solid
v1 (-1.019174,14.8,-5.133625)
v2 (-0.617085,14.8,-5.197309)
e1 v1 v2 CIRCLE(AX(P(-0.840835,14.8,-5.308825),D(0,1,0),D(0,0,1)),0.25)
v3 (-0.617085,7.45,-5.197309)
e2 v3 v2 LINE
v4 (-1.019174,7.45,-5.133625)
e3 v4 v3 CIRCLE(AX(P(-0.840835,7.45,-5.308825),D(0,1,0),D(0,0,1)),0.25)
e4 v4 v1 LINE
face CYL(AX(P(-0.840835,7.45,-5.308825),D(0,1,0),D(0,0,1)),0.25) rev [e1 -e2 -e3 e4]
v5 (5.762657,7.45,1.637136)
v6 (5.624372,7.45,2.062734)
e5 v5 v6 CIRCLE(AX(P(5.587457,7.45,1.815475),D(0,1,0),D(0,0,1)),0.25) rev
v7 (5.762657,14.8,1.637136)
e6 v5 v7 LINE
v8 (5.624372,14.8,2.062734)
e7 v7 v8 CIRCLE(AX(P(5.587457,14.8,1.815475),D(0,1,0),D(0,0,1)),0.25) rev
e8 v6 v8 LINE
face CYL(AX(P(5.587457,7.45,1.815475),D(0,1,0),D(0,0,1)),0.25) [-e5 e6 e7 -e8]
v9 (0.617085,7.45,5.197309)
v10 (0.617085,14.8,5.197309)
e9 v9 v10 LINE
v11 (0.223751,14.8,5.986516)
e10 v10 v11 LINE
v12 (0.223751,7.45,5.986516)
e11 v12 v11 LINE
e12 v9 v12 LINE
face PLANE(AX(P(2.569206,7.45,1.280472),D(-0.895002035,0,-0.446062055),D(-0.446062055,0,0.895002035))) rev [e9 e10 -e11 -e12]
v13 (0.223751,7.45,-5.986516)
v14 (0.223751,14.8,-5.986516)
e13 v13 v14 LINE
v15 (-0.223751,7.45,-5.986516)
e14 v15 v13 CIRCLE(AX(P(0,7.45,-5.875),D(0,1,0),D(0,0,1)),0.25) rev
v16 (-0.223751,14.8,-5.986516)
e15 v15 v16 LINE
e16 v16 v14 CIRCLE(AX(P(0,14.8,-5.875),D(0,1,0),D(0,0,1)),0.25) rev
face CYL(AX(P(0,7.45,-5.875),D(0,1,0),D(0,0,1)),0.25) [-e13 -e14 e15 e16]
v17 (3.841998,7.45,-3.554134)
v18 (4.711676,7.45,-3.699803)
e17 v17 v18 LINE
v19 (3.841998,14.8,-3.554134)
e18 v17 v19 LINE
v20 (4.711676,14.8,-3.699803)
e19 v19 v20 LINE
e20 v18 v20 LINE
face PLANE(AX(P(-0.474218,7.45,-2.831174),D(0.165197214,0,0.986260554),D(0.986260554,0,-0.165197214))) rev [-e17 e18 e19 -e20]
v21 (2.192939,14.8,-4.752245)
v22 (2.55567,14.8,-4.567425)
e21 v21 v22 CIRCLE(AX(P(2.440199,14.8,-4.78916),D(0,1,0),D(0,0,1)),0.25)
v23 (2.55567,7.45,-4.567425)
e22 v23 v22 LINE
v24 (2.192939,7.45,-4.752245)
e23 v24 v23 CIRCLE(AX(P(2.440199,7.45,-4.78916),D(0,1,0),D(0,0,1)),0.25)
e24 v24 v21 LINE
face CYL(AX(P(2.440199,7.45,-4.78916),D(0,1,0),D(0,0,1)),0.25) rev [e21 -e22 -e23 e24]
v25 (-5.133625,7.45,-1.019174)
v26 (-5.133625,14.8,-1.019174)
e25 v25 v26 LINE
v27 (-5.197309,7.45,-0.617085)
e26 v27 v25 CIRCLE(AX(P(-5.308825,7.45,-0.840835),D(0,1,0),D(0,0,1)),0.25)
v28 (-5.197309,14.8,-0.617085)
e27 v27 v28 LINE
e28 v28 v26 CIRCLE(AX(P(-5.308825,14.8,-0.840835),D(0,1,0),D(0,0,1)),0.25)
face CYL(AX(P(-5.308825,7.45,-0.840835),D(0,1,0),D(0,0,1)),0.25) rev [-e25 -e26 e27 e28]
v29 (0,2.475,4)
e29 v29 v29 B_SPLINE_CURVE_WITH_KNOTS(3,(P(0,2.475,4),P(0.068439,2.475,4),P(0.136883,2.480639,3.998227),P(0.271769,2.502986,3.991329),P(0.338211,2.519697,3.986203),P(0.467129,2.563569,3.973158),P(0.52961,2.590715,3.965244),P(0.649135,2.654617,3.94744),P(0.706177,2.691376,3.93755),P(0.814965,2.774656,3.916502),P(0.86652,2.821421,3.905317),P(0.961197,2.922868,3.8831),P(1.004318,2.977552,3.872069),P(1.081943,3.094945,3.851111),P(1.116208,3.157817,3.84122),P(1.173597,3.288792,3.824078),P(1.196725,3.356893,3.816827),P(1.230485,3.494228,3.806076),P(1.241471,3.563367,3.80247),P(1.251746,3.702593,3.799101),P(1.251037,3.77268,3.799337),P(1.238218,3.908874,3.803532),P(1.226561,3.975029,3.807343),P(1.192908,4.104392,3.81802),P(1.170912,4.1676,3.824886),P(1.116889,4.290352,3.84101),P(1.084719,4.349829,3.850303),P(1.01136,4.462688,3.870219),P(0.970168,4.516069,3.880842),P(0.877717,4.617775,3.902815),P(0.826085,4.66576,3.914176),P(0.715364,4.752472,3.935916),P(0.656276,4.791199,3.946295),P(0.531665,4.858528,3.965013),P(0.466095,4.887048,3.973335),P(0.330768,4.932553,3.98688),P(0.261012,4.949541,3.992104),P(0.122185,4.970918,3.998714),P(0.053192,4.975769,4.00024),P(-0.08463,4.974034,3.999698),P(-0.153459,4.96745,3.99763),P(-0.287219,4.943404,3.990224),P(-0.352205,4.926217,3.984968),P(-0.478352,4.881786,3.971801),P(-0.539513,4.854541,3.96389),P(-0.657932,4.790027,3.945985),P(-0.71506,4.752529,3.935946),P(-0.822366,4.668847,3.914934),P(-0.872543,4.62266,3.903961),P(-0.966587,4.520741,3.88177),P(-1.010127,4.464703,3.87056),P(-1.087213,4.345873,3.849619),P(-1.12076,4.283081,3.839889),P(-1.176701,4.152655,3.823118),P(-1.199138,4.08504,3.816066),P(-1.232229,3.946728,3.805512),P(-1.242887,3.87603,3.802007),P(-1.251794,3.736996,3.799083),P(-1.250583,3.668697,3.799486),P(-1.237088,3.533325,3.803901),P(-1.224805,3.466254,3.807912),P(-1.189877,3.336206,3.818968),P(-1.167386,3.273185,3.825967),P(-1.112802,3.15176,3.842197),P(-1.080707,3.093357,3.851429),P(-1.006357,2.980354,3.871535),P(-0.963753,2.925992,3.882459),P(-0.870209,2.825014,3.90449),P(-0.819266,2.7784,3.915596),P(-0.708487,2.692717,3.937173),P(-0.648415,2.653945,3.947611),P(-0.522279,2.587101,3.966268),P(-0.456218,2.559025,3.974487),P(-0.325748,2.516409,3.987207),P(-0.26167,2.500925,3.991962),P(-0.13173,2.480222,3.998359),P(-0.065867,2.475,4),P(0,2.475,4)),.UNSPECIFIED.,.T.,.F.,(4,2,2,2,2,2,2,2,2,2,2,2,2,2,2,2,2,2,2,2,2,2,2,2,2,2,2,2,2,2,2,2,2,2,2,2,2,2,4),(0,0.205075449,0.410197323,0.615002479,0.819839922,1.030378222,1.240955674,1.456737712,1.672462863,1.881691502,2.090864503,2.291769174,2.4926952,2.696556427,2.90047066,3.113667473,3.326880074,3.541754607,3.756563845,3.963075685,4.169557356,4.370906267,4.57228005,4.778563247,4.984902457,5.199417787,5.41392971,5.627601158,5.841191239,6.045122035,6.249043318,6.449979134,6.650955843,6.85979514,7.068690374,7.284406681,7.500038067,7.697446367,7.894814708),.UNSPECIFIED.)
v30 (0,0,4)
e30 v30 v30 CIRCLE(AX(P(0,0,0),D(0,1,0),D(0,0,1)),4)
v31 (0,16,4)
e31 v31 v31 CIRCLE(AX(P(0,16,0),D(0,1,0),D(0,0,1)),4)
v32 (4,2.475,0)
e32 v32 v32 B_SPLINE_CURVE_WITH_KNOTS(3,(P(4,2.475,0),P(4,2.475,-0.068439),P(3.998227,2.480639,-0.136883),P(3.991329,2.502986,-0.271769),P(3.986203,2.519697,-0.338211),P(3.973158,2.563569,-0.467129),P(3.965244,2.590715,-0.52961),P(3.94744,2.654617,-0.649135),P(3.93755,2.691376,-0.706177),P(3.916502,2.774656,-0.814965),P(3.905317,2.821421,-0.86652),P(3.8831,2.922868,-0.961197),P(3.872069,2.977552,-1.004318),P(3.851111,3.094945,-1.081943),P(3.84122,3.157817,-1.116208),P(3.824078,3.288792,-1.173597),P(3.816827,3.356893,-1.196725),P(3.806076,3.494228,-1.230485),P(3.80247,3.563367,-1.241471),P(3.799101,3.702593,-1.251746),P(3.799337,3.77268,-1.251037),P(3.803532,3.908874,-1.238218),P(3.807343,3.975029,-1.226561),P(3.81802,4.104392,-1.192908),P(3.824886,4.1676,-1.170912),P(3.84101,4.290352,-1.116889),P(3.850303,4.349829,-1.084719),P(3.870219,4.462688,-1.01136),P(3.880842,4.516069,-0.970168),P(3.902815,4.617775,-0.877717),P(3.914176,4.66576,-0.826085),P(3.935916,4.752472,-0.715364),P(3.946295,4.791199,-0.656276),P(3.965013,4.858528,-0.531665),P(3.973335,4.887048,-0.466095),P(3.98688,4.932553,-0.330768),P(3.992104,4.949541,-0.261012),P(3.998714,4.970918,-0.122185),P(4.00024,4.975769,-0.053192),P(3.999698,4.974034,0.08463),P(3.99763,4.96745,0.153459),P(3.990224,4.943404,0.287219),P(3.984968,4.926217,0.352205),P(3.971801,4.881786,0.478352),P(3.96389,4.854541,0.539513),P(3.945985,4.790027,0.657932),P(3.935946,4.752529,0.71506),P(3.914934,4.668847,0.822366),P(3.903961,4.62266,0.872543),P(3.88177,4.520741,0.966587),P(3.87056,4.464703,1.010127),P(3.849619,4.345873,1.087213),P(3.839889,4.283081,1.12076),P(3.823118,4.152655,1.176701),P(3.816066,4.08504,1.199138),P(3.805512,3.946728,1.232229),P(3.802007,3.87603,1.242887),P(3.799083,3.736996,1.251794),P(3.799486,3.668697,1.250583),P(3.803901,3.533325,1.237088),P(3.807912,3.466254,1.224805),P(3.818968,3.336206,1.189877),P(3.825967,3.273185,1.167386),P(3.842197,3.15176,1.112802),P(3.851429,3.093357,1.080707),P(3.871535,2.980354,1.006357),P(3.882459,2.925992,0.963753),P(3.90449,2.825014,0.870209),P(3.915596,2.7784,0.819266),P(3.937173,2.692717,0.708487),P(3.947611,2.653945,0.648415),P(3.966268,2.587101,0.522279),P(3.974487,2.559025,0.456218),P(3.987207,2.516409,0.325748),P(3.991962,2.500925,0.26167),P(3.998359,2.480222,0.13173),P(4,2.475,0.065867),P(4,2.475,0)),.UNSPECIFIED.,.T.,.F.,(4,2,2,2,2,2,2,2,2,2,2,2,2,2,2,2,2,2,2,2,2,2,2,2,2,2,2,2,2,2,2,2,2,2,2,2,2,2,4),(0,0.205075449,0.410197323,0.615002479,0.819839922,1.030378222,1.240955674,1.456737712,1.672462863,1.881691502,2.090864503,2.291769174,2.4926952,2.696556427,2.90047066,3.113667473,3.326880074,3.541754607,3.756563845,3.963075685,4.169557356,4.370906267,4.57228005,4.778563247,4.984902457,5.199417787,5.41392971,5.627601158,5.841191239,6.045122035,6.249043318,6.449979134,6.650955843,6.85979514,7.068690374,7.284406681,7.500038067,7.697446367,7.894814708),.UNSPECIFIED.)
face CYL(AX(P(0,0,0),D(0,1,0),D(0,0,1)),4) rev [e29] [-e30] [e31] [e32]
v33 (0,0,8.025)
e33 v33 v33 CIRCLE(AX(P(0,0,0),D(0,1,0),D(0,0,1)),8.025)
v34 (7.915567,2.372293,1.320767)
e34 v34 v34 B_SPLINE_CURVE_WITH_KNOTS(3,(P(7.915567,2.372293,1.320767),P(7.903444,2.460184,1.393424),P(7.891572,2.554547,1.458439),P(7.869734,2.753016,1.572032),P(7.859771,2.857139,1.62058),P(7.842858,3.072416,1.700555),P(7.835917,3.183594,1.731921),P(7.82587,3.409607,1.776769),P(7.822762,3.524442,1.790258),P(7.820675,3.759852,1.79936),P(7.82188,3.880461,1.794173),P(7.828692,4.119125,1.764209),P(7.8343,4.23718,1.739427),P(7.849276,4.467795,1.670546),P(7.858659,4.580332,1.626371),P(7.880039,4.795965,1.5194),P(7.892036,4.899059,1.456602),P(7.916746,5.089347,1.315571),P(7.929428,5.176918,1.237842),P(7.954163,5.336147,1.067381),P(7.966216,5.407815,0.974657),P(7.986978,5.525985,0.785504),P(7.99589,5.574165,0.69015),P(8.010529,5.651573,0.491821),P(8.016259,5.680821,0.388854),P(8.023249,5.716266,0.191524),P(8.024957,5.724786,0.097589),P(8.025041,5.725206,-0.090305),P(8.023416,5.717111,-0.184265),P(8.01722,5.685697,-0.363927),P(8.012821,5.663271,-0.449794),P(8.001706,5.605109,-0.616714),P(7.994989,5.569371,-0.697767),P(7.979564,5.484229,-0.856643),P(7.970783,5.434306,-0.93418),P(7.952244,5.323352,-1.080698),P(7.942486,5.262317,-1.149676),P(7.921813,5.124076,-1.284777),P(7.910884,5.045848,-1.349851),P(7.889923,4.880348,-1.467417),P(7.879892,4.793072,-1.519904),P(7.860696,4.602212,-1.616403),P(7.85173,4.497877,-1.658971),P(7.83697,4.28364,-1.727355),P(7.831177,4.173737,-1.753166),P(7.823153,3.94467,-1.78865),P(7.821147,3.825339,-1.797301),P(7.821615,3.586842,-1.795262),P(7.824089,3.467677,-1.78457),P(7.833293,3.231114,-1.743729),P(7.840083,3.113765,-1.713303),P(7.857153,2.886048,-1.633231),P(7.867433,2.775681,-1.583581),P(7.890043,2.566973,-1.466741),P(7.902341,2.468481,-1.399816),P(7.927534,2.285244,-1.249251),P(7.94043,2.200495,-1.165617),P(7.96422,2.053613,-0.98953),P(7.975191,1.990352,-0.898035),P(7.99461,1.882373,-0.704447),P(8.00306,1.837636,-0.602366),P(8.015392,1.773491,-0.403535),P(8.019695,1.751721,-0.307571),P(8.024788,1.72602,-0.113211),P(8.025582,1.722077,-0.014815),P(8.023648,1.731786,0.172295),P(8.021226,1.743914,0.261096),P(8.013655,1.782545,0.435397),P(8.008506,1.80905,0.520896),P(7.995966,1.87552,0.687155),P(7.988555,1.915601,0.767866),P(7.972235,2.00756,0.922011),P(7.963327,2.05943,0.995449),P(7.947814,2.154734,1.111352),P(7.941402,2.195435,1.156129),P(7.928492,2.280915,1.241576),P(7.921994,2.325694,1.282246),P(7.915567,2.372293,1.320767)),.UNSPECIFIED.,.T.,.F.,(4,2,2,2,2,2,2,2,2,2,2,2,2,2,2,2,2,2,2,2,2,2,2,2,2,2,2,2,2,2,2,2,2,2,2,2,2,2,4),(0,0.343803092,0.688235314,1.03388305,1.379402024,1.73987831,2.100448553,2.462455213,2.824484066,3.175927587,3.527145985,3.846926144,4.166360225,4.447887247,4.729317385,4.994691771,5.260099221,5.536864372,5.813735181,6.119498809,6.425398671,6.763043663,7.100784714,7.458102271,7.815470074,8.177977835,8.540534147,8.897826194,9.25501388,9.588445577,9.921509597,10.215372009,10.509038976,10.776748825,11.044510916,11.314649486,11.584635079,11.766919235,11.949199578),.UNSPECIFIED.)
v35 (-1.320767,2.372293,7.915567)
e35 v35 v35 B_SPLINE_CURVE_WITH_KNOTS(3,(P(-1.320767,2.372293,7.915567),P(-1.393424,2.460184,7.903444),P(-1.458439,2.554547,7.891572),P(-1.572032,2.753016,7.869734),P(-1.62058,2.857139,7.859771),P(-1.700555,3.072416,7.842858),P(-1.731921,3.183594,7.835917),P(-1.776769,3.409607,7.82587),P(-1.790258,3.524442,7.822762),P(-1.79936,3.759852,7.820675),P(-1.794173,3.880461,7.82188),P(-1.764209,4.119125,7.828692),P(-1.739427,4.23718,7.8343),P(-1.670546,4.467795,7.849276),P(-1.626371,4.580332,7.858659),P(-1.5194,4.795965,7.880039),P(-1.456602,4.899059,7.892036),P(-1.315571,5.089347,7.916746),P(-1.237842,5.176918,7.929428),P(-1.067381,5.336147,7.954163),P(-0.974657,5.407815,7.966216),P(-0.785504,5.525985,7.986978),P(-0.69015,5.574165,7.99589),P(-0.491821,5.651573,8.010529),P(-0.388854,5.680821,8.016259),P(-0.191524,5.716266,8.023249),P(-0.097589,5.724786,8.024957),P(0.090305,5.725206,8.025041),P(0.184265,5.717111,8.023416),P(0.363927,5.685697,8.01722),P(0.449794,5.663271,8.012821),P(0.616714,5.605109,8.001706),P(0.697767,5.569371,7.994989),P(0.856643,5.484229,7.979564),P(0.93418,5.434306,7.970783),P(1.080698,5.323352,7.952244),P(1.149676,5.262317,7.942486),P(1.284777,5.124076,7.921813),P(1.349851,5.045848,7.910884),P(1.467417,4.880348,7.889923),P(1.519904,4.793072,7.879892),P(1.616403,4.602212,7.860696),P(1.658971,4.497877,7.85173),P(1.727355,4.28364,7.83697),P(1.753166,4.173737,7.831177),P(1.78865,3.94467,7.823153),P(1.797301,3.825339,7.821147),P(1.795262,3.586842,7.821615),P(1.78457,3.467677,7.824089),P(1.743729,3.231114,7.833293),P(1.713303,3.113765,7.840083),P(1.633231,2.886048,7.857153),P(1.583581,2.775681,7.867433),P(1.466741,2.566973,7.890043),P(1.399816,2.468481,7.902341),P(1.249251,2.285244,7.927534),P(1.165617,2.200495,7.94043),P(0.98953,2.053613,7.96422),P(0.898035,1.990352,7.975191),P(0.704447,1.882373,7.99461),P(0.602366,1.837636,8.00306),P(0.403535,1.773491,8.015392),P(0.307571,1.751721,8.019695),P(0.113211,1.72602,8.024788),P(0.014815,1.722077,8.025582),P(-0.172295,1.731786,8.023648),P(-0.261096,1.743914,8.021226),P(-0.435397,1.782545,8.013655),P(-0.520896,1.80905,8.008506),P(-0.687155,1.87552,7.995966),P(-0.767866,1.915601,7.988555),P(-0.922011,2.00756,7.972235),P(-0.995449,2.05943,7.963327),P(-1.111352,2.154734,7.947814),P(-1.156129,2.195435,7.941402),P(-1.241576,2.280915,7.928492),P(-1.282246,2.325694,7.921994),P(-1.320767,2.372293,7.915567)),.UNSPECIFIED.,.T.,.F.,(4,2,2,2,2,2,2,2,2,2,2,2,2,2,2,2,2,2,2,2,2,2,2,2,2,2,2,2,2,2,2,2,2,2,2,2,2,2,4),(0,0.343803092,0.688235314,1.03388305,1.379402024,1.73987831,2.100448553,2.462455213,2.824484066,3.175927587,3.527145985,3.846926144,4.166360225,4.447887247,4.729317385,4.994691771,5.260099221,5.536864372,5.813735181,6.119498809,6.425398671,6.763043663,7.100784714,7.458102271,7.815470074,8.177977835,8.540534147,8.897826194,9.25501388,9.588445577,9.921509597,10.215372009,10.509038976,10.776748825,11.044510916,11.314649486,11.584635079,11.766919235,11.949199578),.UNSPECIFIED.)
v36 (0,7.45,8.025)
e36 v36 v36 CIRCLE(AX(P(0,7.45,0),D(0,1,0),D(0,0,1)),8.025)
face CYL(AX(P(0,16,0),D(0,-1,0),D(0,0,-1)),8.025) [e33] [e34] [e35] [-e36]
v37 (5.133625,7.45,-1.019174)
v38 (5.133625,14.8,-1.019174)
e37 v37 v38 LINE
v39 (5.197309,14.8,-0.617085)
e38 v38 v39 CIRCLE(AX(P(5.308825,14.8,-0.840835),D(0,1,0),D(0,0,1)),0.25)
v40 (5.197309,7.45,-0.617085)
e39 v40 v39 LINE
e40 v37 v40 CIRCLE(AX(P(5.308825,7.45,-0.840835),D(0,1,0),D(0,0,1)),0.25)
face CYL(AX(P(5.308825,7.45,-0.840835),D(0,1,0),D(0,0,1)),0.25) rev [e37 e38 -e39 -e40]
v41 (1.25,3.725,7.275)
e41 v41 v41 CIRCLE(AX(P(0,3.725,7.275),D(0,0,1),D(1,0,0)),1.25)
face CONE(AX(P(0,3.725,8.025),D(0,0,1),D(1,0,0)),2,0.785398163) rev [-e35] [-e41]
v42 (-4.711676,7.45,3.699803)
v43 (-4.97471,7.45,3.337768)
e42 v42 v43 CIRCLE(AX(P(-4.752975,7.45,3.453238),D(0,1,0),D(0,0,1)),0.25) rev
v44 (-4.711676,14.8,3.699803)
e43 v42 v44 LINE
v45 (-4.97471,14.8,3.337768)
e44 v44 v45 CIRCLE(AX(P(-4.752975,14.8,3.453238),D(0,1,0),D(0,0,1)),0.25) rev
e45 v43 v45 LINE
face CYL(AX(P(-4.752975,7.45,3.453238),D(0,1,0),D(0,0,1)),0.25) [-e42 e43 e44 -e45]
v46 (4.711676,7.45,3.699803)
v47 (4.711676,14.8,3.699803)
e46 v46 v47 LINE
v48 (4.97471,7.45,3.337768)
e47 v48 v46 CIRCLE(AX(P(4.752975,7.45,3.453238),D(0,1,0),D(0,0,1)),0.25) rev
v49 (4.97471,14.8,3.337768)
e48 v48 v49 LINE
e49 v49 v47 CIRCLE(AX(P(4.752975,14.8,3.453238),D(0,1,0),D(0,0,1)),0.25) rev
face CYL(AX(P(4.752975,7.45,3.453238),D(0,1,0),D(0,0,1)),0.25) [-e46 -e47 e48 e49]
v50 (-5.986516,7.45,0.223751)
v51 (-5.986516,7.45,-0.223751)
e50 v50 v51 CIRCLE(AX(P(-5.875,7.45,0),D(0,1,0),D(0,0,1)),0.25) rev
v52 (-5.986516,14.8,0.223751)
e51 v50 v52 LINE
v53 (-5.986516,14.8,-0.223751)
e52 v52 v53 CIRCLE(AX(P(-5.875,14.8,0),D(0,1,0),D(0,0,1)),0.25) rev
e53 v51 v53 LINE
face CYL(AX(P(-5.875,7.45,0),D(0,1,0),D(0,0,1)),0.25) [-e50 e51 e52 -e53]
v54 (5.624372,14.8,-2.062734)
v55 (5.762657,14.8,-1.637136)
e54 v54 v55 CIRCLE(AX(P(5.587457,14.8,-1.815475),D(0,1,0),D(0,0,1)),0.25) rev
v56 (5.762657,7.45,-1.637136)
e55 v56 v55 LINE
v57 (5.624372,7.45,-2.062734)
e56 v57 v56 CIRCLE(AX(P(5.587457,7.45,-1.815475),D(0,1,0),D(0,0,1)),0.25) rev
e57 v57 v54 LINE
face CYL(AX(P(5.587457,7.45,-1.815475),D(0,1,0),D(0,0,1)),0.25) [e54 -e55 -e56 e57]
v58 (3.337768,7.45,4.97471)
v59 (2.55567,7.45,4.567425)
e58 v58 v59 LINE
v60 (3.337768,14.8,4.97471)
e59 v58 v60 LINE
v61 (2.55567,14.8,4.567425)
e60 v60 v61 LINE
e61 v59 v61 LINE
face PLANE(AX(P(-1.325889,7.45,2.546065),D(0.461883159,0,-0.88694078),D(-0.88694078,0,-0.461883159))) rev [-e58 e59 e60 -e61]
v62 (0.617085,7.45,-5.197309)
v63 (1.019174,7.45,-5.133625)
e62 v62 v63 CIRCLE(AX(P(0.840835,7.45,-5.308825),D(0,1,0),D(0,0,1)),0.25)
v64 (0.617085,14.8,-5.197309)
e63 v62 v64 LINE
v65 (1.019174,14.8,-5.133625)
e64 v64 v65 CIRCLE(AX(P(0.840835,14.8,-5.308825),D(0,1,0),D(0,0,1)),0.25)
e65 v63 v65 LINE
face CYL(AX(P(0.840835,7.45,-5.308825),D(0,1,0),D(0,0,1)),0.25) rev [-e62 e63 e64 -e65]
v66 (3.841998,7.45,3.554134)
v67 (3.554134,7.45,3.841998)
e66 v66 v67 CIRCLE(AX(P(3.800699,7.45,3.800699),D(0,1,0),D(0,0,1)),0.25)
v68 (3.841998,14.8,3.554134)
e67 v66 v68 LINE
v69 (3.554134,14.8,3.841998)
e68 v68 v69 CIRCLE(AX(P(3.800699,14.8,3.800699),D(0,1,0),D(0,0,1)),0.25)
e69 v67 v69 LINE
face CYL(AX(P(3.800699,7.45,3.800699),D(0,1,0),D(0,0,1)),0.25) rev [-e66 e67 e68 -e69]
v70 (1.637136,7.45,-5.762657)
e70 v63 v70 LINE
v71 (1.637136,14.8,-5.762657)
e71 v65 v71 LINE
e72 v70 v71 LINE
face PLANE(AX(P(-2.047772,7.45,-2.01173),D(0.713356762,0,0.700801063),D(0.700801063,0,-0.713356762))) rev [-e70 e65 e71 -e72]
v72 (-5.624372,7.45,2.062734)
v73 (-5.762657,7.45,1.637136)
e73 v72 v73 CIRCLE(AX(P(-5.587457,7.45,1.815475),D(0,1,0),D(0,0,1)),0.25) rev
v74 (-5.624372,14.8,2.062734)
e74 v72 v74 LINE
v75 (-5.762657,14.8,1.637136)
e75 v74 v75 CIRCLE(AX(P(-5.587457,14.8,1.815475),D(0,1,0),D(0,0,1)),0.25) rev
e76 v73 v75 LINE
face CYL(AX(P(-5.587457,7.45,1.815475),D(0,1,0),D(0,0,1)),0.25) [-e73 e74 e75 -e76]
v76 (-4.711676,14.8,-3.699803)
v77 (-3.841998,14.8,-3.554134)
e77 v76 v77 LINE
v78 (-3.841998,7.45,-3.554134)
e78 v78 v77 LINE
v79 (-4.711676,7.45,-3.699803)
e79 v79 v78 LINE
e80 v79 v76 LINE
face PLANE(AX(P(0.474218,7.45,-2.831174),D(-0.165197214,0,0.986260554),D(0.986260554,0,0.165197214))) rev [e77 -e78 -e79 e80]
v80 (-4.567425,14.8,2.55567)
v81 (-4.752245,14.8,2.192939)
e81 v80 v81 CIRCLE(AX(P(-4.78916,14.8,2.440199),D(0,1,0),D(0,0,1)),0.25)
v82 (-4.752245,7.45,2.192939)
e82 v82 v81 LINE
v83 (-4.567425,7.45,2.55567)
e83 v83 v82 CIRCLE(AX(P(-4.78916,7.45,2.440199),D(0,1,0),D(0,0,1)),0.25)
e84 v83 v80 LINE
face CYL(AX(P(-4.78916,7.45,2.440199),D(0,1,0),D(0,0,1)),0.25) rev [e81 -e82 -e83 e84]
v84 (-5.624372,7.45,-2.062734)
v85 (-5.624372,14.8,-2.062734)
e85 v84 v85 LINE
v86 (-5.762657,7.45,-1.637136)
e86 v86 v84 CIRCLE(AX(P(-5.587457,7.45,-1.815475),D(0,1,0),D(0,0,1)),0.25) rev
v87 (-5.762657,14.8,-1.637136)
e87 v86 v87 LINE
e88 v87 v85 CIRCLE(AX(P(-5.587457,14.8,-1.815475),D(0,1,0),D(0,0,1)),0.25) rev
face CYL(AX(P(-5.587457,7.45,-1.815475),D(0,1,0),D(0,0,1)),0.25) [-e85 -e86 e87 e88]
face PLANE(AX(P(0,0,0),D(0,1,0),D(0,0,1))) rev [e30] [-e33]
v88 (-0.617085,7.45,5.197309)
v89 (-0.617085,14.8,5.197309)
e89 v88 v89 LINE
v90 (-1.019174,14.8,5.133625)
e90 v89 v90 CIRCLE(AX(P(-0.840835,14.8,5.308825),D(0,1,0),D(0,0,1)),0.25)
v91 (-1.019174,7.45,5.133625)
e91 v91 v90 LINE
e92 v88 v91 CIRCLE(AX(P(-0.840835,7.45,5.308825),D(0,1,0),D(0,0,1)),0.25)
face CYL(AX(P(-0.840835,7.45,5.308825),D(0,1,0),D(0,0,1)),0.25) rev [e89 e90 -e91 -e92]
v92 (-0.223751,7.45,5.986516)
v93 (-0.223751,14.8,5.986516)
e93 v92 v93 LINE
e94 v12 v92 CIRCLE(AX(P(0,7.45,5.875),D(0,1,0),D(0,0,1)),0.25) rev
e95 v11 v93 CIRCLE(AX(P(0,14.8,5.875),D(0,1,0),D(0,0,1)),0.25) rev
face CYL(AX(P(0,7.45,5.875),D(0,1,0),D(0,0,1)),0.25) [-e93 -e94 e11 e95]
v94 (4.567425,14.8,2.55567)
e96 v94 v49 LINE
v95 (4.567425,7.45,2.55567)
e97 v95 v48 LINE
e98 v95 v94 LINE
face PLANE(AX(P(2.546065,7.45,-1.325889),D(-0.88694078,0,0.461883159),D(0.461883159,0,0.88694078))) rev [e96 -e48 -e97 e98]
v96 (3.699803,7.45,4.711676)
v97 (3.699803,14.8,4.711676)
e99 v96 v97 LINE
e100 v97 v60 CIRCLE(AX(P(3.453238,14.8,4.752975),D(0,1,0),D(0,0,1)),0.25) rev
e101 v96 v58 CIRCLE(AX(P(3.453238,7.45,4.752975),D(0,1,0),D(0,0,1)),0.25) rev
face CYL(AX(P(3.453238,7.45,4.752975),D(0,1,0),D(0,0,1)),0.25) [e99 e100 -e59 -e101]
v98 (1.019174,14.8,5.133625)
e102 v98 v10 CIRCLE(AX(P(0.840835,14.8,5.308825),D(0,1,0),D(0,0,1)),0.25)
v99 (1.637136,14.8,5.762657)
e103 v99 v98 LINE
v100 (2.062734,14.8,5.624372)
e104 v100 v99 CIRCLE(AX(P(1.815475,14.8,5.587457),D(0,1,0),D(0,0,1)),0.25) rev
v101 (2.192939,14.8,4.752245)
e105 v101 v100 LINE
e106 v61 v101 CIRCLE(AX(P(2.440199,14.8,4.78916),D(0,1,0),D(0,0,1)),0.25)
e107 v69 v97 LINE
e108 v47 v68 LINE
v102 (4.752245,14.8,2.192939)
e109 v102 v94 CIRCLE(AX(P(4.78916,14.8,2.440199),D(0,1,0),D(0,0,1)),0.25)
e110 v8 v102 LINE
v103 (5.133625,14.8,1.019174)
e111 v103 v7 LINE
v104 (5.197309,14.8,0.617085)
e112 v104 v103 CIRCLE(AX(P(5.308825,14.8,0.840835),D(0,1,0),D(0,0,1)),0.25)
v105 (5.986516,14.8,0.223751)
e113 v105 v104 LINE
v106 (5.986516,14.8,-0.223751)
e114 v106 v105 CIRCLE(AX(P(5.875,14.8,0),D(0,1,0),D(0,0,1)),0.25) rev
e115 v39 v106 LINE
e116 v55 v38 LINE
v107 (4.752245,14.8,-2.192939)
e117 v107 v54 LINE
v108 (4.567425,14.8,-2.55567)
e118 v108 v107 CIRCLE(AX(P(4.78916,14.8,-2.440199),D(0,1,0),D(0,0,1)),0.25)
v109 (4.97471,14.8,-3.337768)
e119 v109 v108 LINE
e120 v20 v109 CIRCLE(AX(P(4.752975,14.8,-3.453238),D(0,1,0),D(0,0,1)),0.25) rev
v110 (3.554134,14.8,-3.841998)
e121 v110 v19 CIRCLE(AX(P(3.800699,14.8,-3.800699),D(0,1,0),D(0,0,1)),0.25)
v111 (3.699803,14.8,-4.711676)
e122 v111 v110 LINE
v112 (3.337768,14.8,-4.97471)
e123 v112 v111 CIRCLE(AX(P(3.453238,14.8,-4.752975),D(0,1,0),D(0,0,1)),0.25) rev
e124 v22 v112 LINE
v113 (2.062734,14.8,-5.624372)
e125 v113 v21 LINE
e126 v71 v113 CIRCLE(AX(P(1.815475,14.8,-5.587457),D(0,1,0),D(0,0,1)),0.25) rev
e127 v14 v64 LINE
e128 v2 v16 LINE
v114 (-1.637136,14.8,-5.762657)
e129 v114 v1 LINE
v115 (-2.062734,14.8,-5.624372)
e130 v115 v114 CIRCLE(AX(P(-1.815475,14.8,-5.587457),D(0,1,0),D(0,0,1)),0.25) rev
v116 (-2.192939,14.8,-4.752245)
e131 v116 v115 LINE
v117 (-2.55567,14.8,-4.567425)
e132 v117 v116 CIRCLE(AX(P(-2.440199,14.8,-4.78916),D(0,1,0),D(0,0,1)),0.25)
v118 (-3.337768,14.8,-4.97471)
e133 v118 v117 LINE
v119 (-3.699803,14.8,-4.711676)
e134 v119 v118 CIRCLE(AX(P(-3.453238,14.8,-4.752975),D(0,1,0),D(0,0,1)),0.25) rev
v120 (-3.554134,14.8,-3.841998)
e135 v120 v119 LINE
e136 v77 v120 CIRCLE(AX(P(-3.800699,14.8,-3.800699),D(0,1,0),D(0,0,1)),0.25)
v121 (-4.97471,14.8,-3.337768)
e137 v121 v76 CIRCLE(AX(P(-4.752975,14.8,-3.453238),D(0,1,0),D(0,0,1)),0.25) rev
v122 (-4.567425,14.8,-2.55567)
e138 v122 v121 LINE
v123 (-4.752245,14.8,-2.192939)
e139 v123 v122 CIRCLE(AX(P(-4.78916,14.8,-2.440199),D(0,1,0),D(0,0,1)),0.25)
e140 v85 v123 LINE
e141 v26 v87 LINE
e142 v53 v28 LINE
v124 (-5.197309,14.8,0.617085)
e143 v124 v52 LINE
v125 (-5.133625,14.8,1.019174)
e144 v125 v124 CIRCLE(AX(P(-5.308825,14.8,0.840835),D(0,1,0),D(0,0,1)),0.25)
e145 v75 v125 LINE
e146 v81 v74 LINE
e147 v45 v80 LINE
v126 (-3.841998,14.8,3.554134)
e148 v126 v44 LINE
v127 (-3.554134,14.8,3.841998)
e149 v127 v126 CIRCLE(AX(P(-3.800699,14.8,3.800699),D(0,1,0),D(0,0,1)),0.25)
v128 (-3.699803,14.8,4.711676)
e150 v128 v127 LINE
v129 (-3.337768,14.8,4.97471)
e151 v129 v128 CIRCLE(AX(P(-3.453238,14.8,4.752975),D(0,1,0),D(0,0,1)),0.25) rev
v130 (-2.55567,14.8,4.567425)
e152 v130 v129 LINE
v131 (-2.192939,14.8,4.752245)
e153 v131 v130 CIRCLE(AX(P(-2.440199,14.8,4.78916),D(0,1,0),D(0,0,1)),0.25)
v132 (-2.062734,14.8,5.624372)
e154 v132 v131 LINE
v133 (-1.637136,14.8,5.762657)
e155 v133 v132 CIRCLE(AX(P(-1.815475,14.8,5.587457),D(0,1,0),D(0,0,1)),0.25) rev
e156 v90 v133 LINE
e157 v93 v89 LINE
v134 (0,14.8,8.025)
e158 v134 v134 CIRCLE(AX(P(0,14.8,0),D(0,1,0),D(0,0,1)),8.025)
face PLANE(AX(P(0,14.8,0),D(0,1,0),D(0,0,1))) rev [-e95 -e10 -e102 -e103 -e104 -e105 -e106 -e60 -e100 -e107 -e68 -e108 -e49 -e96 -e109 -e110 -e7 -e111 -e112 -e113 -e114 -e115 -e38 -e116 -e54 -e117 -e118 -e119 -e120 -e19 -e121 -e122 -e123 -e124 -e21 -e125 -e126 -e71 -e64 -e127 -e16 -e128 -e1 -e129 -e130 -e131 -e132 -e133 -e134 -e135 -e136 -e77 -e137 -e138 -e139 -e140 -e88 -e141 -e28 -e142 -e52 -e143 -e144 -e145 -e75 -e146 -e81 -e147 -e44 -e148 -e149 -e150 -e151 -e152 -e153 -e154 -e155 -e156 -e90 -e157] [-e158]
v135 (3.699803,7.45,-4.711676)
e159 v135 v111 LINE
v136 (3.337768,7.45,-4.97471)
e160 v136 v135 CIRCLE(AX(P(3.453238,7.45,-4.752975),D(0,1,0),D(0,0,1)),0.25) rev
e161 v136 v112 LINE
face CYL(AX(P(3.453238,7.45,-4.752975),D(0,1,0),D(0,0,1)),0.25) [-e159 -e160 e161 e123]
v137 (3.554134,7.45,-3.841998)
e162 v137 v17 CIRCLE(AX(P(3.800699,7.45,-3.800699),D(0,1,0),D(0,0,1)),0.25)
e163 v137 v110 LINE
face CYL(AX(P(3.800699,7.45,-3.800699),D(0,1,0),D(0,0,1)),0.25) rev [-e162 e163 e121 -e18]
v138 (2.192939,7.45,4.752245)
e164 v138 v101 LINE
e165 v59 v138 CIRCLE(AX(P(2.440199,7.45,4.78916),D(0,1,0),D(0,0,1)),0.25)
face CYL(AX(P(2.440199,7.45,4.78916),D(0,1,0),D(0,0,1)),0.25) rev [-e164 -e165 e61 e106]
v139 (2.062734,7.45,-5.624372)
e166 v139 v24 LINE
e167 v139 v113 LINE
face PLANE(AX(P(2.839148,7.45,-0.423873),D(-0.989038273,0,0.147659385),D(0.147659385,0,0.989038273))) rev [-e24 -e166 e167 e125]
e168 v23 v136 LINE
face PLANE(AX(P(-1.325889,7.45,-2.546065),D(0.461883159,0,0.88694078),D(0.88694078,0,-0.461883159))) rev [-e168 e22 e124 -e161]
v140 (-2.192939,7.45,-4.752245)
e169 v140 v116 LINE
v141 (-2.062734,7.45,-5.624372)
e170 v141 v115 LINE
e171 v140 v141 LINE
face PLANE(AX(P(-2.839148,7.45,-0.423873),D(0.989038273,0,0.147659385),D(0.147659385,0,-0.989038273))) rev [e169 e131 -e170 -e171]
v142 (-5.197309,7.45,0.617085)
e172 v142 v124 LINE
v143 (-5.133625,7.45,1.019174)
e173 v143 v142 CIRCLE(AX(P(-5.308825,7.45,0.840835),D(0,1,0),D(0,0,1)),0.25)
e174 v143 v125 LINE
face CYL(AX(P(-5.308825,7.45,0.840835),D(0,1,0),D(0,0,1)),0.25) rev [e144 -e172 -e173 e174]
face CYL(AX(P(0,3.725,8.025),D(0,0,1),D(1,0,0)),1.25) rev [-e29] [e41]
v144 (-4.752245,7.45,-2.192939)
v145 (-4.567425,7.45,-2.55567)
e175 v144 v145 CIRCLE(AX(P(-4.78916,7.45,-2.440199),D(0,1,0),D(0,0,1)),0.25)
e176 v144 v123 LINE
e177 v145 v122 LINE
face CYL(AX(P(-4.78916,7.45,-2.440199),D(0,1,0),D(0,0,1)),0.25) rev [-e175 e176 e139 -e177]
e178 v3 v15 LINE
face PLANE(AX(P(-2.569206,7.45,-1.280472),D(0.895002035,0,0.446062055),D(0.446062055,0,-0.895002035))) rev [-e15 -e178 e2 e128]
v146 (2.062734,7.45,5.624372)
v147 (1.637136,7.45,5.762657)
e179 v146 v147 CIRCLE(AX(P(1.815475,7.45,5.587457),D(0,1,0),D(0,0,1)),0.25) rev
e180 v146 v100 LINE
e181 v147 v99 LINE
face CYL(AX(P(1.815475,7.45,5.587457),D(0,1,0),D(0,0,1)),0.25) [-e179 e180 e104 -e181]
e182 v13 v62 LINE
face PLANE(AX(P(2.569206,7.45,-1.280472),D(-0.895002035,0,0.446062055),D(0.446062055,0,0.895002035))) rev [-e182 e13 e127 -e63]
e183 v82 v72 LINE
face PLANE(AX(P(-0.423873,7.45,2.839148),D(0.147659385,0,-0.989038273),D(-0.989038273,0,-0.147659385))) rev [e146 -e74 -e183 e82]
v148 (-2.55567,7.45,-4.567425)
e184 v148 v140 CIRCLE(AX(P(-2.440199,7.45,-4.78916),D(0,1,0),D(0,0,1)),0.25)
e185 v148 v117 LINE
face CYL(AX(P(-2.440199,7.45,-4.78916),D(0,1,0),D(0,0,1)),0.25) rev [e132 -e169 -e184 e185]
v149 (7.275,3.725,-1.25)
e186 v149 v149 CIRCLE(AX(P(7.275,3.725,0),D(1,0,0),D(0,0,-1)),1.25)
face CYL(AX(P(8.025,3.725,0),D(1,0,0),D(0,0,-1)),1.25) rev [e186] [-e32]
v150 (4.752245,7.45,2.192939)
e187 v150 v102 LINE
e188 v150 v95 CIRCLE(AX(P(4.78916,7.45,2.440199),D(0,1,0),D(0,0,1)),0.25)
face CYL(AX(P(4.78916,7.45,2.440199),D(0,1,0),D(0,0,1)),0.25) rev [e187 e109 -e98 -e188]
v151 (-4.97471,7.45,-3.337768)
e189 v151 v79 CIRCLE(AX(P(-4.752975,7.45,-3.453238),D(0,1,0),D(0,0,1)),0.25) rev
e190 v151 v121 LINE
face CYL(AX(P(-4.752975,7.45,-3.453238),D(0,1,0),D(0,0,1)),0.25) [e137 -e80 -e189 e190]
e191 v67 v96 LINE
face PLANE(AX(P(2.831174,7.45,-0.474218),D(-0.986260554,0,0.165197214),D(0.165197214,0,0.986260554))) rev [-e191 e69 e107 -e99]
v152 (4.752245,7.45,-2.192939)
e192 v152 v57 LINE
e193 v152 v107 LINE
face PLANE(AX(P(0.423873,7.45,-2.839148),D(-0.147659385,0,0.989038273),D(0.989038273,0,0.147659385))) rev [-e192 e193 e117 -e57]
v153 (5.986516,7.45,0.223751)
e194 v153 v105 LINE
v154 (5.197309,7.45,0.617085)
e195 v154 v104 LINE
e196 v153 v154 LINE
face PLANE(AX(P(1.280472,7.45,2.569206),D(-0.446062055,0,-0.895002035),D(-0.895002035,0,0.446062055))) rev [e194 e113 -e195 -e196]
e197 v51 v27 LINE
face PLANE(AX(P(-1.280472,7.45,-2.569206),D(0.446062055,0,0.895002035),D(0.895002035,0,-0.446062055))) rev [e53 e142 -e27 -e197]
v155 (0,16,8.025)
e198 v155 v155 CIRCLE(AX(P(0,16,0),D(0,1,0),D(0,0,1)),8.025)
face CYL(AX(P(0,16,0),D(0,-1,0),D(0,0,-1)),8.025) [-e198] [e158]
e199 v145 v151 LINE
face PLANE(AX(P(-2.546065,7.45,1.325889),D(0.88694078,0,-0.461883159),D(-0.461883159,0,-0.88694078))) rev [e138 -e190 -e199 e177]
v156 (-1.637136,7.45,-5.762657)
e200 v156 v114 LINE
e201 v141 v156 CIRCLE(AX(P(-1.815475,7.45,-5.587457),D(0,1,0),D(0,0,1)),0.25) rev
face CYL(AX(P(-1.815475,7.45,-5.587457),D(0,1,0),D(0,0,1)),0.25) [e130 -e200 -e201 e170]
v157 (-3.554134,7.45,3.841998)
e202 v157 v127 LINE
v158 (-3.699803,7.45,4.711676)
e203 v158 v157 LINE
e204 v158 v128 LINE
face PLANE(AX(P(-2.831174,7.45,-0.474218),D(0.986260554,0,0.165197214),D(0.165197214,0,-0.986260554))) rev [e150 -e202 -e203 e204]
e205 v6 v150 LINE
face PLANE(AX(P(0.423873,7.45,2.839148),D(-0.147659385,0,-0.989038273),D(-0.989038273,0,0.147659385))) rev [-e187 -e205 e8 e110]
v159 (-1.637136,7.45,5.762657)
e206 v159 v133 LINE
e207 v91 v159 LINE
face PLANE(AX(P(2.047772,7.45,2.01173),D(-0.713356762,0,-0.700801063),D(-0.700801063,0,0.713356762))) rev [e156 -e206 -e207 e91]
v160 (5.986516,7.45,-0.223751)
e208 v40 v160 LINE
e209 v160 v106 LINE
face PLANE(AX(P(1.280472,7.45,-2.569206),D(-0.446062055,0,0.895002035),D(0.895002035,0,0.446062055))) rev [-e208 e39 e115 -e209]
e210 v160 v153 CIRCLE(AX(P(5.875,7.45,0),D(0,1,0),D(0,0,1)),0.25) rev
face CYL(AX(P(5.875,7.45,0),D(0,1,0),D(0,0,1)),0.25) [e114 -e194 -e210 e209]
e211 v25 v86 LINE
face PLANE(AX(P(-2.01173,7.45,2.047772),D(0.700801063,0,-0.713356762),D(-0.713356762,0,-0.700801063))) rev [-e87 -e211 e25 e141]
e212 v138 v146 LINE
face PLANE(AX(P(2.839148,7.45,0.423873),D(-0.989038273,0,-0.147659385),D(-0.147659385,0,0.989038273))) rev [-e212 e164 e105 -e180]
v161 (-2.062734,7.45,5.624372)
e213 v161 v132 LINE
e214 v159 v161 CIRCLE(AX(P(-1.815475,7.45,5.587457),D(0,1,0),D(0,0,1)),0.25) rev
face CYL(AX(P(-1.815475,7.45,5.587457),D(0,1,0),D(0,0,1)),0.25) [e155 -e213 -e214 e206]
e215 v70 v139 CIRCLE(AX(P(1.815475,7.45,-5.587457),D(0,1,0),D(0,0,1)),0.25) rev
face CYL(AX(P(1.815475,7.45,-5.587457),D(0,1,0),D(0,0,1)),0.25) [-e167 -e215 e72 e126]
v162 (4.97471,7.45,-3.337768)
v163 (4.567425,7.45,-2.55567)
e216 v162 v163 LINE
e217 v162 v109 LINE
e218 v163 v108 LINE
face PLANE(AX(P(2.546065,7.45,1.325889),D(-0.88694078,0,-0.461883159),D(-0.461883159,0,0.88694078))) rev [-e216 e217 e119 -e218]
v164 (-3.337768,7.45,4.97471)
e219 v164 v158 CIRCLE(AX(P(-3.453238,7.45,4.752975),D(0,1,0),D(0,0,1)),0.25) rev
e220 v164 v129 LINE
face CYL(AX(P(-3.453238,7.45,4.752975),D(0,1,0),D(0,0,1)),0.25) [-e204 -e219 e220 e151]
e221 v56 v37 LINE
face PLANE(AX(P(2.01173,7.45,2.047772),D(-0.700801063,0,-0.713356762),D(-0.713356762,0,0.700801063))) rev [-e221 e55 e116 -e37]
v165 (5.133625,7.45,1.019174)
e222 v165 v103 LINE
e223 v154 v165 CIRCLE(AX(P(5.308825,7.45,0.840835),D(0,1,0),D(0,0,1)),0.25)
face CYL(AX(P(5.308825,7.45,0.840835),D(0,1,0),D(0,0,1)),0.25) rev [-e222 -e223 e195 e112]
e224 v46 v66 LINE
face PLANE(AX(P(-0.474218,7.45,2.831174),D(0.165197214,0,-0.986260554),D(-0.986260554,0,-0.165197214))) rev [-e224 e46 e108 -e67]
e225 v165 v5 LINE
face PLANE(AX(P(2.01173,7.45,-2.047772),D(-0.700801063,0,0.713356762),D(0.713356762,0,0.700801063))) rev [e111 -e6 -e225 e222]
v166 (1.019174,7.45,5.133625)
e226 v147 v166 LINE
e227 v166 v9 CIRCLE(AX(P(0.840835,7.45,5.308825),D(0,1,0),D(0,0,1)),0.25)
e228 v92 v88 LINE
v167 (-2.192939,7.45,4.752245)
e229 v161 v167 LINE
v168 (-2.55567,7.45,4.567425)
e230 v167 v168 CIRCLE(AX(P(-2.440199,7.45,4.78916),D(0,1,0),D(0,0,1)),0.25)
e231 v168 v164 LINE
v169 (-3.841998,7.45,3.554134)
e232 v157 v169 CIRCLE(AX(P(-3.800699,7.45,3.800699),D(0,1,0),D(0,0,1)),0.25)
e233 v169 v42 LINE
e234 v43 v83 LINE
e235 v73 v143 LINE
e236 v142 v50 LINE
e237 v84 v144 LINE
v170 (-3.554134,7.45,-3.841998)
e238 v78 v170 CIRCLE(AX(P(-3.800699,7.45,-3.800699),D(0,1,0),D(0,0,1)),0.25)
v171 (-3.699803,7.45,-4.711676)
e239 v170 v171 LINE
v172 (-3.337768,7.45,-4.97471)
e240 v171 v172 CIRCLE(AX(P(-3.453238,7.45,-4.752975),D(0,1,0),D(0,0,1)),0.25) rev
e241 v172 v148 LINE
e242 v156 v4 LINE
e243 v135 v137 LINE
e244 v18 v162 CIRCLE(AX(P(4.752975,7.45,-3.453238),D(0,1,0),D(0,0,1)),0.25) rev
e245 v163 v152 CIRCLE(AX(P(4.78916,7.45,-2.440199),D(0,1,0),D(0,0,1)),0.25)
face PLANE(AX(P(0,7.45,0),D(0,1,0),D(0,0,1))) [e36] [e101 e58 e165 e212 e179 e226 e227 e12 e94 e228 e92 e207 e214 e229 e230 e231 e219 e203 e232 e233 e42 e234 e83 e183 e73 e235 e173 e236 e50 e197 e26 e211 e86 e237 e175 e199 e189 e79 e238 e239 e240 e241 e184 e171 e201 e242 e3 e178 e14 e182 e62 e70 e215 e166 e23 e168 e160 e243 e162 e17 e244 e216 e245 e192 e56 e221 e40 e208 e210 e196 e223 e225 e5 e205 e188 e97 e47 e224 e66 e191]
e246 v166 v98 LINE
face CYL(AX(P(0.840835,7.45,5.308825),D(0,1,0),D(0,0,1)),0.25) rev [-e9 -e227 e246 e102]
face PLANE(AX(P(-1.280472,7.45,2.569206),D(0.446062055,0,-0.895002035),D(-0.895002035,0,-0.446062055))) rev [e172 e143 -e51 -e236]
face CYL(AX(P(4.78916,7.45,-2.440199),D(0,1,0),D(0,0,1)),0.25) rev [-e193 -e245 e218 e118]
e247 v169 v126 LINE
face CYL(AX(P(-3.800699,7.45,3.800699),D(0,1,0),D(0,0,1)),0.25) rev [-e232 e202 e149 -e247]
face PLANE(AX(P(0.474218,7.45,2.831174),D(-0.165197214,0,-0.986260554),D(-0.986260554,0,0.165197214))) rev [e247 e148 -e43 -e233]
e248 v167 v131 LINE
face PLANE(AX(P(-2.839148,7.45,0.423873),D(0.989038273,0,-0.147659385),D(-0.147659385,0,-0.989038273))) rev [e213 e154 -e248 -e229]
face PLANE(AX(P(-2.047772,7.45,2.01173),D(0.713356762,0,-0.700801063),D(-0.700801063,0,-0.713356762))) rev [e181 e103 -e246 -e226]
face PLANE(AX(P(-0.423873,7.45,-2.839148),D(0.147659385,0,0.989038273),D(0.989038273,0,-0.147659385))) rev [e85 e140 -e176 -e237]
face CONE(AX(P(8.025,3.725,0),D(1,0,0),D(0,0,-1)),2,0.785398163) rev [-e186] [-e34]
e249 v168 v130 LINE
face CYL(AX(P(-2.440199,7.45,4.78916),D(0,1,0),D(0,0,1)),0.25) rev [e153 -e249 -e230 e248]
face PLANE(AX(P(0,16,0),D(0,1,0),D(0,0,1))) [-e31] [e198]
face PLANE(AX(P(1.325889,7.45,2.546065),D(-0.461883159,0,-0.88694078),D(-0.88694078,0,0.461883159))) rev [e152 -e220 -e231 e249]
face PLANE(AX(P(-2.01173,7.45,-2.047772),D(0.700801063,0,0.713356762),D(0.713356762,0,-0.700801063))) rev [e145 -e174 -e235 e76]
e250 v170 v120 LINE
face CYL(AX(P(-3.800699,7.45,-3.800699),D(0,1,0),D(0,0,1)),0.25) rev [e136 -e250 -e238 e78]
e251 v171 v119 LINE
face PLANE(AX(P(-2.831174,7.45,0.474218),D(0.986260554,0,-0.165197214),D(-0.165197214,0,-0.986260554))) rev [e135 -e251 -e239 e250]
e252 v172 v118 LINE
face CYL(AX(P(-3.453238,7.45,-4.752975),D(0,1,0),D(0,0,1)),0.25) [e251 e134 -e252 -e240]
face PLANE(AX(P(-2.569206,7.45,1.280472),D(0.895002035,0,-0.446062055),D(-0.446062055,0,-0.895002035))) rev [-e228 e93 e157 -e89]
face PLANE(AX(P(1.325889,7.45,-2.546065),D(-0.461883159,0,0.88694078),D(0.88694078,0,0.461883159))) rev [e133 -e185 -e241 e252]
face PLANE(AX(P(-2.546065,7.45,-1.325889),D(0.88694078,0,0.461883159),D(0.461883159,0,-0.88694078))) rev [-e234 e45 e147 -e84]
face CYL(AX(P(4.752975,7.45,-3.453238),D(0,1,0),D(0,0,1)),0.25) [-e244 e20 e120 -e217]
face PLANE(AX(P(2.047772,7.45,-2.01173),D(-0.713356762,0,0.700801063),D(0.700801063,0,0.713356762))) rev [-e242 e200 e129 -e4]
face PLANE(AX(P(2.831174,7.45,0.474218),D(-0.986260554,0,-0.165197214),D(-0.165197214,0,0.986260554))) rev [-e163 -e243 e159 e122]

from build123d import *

# Parameters (mm, degrees)
SKETCH1_R           = 8.025
BOSS_EXTRUDE1_DEPTH = 16
CUT_EXTRUDE1_START  = -8.55
SKETCH2_R           = 8.025
CUT_EXTRUDE1_DEPTH  = 7.35
SKETCH3_R           = 4
CUT_EXTRUDE2_DEPTH  = 20.616351598
CIRPATTERN1_COUNT   = 2
CIRPATTERN1_ANGLE   = 90


# Read off the part's stored shape, not the designer's step: M3x0.5 Tapped Hole1
with BuildPart() as part:
    # Sketch1 → Boss-Extrude1 (new body)
    with BuildSketch(Plane(origin=(0, 0, 0), x_dir=(1, 0, 0), z_dir=(0, 1, 0))):
        with Locations(Location((0, 0, 0), (0, 0, 270))):
            Circle(SKETCH1_R)
    extrude(amount=BOSS_EXTRUDE1_DEPTH)

    # Sketch2 → Cut-Extrude1 (cut)
    with BuildSketch(Plane(origin=(0, 16, 0), x_dir=(1, 0, 0), z_dir=(0, 1, 0)).offset(CUT_EXTRUDE1_START)):
        with Locations(Location((0, 0, 0), (0, 0, 270))):
            Circle(SKETCH2_R)
        with BuildLine():
            Line((0.223750509, 5.986515514), (0.617084741, 5.197309317))
            ThreePointArc((0.617084741, 5.197309317), (0.801726633, 5.061902746), (1.01917444, 5.133624565))
            Line((1.01917444, 5.133624565), (1.637135651, 5.762657299))
            ThreePointArc((1.637135651, 5.762657299), (1.756034951, 5.830288043), (1.892729091, 5.825221162))
            ThreePointArc((1.892729091, 5.825221162), (2.00629521, 5.748973556), (2.06273441, 5.62437188))
            Line((2.06273441, 5.62437188), (2.192939368, 4.752245221))
            ThreePointArc((2.192939368, 4.752245221), (2.326701311, 4.566408436), (2.555669726, 4.567424872))
            Line((2.555669726, 4.567424872), (3.337767568, 4.974710037))
            ThreePointArc((3.337767568, 4.974710037), (3.471746571, 5.002288793), (3.60018467, 4.955229091))
            ThreePointArc((3.60018467, 4.955229091), (3.684630662, 4.847619447), (3.699803496, 4.711675538))
            Line((3.699803496, 4.711675538), (3.55413381, 3.841998252))
            ThreePointArc((3.55413381, 3.841998252), (3.623922254, 3.623922254), (3.841998252, 3.55413381))
            Line((3.841998252, 3.55413381), (4.711675538, 3.699803496))
            ThreePointArc((4.711675538, 3.699803496), (4.847619447, 3.684630662), (4.955229091, 3.60018467))
            ThreePointArc((4.955229091, 3.60018467), (5.002288793, 3.471746571), (4.974710037, 3.337767568))
            Line((4.974710037, 3.337767568), (4.567424872, 2.555669726))
            ThreePointArc((4.567424872, 2.555669726), (4.566408436, 2.326701311), (4.752245221, 2.192939368))
            Line((4.752245221, 2.192939368), (5.62437188, 2.06273441))
            ThreePointArc((5.62437188, 2.06273441), (5.748973556, 2.00629521), (5.825221162, 1.892729091))
            ThreePointArc((5.825221162, 1.892729091), (5.830288043, 1.756034951), (5.762657299, 1.637135651))
            Line((5.762657299, 1.637135651), (5.133624565, 1.01917444))
            ThreePointArc((5.133624565, 1.01917444), (5.061902746, 0.801726633), (5.197309317, 0.617084741))
            Line((5.197309317, 0.617084741), (5.986515514, 0.223750509))
            ThreePointArc((5.986515514, 0.223750509), (6.087578078, 0.131569604), (6.125, 0))
            ThreePointArc((6.125, 0), (6.087578078, -0.131569604), (5.986515514, -0.223750509))
            Line((5.986515514, -0.223750509), (5.197309317, -0.617084741))
            ThreePointArc((5.197309317, -0.617084741), (5.061902746, -0.801726633), (5.133624565, -1.01917444))
            Line((5.133624565, -1.01917444), (5.762657299, -1.637135651))
            ThreePointArc((5.762657299, -1.637135651), (5.830288043, -1.756034951), (5.825221162, -1.892729091))
            ThreePointArc((5.825221162, -1.892729091), (5.748973556, -2.00629521), (5.62437188, -2.06273441))
            Line((5.62437188, -2.06273441), (4.752245221, -2.192939368))
            ThreePointArc((4.752245221, -2.192939368), (4.566408436, -2.326701311), (4.567424872, -2.555669726))
            Line((4.567424872, -2.555669726), (4.974710037, -3.337767568))
            ThreePointArc((4.974710037, -3.337767568), (5.002288793, -3.471746571), (4.955229091, -3.60018467))
            ThreePointArc((4.955229091, -3.60018467), (4.847619447, -3.684630662), (4.711675538, -3.699803496))
            Line((4.711675538, -3.699803496), (3.841998252, -3.55413381))
            ThreePointArc((3.841998252, -3.55413381), (3.623922254, -3.623922254), (3.55413381, -3.841998252))
            Line((3.55413381, -3.841998252), (3.699803496, -4.711675538))
            ThreePointArc((3.699803496, -4.711675538), (3.684630662, -4.847619447), (3.60018467, -4.955229091))
            ThreePointArc((3.60018467, -4.955229091), (3.471746571, -5.002288793), (3.337767568, -4.974710037))
            Line((3.337767568, -4.974710037), (2.555669726, -4.567424872))
            ThreePointArc((2.555669726, -4.567424872), (2.326701311, -4.566408436), (2.192939368, -4.752245221))
            Line((2.192939368, -4.752245221), (2.06273441, -5.62437188))
            ThreePointArc((2.06273441, -5.62437188), (2.00629521, -5.748973556), (1.892729091, -5.825221162))
            ThreePointArc((1.892729091, -5.825221162), (1.756034951, -5.830288043), (1.637135651, -5.762657299))
            Line((1.637135651, -5.762657299), (1.01917444, -5.133624565))
            ThreePointArc((1.01917444, -5.133624565), (0.801726633, -5.061902746), (0.617084741, -5.197309317))
            Line((0.617084741, -5.197309317), (0.223750509, -5.986515514))
            ThreePointArc((0.223750509, -5.986515514), (0.131569604, -6.087578078), (0, -6.125))
            ThreePointArc((0, -6.125), (-0.131569604, -6.087578078), (-0.223750509, -5.986515514))
            Line((-0.223750509, -5.986515514), (-0.617084741, -5.197309317))
            ThreePointArc((-0.617084741, -5.197309317), (-0.801726633, -5.061902746), (-1.01917444, -5.133624565))
            Line((-1.01917444, -5.133624565), (-1.637135651, -5.762657299))
            ThreePointArc((-1.637135651, -5.762657299), (-1.756034951, -5.830288043), (-1.892729091, -5.825221162))
            ThreePointArc((-1.892729091, -5.825221162), (-2.00629521, -5.748973556), (-2.06273441, -5.62437188))
            Line((-2.06273441, -5.62437188), (-2.192939368, -4.752245221))
            ThreePointArc((-2.192939368, -4.752245221), (-2.326701311, -4.566408436), (-2.555669726, -4.567424872))
            Line((-2.555669726, -4.567424872), (-3.337767568, -4.974710037))
            ThreePointArc((-3.337767568, -4.974710037), (-3.471746571, -5.002288793), (-3.60018467, -4.955229091))
            ThreePointArc((-3.60018467, -4.955229091), (-3.684630662, -4.847619447), (-3.699803496, -4.711675538))
            Line((-3.699803496, -4.711675538), (-3.55413381, -3.841998252))
            ThreePointArc((-3.55413381, -3.841998252), (-3.623922254, -3.623922254), (-3.841998252, -3.55413381))
            Line((-3.841998252, -3.55413381), (-4.711675538, -3.699803496))
            ThreePointArc((-4.711675538, -3.699803496), (-4.847619447, -3.684630662), (-4.955229091, -3.60018467))
            ThreePointArc((-4.955229091, -3.60018467), (-5.002288793, -3.471746571), (-4.974710037, -3.337767568))
            Line((-4.974710037, -3.337767568), (-4.567424872, -2.555669726))
            ThreePointArc((-4.567424872, -2.555669726), (-4.566408436, -2.326701311), (-4.752245221, -2.192939368))
            Line((-4.752245221, -2.192939368), (-5.62437188, -2.06273441))
            ThreePointArc((-5.62437188, -2.06273441), (-5.748973556, -2.00629521), (-5.825221162, -1.892729091))
            ThreePointArc((-5.825221162, -1.892729091), (-5.830288043, -1.756034951), (-5.762657299, -1.637135651))
            Line((-5.762657299, -1.637135651), (-5.133624565, -1.01917444))
            ThreePointArc((-5.133624565, -1.01917444), (-5.061902746, -0.801726633), (-5.197309317, -0.617084741))
            Line((-5.197309317, -0.617084741), (-5.986515514, -0.223750509))
            ThreePointArc((-5.986515514, -0.223750509), (-6.087578078, -0.131569604), (-6.125, 0))
            ThreePointArc((-6.125, 0), (-6.087578078, 0.131569604), (-5.986515514, 0.223750509))
            Line((-5.986515514, 0.223750509), (-5.197309317, 0.617084741))
            ThreePointArc((-5.197309317, 0.617084741), (-5.061902746, 0.801726633), (-5.133624565, 1.01917444))
            Line((-5.133624565, 1.01917444), (-5.762657299, 1.637135651))
            ThreePointArc((-5.762657299, 1.637135651), (-5.830288043, 1.756034951), (-5.825221162, 1.892729091))
            ThreePointArc((-5.825221162, 1.892729091), (-5.748973556, 2.00629521), (-5.62437188, 2.06273441))
            Line((-5.62437188, 2.06273441), (-4.752245221, 2.192939368))
            ThreePointArc((-4.752245221, 2.192939368), (-4.566408436, 2.326701311), (-4.567424872, 2.555669726))
            Line((-4.567424872, 2.555669726), (-4.974710037, 3.337767568))
            ThreePointArc((-4.974710037, 3.337767568), (-5.002288793, 3.471746571), (-4.955229091, 3.60018467))
            ThreePointArc((-4.955229091, 3.60018467), (-4.847619447, 3.684630662), (-4.711675538, 3.699803496))
            Line((-4.711675538, 3.699803496), (-3.841998252, 3.55413381))
            ThreePointArc((-3.841998252, 3.55413381), (-3.623922254, 3.623922254), (-3.55413381, 3.841998252))
            Line((-3.55413381, 3.841998252), (-3.699803496, 4.711675538))
            ThreePointArc((-3.699803496, 4.711675538), (-3.684630662, 4.847619447), (-3.60018467, 4.955229091))
            ThreePointArc((-3.60018467, 4.955229091), (-3.471746571, 5.002288793), (-3.337767568, 4.974710037))
            Line((-3.337767568, 4.974710037), (-2.555669726, 4.567424872))
            ThreePointArc((-2.555669726, 4.567424872), (-2.326701311, 4.566408436), (-2.192939368, 4.752245221))
            Line((-2.192939368, 4.752245221), (-2.06273441, 5.62437188))
            ThreePointArc((-2.06273441, 5.62437188), (-2.00629521, 5.748973556), (-1.892729091, 5.825221162))
            ThreePointArc((-1.892729091, 5.825221162), (-1.756034951, 5.830288043), (-1.637135651, 5.762657299))
            Line((-1.637135651, 5.762657299), (-1.01917444, 5.133624565))
            ThreePointArc((-1.01917444, 5.133624565), (-0.801726633, 5.061902746), (-0.617084741, 5.197309317))
            Line((-0.617084741, 5.197309317), (-0.223750509, 5.986515514))
            ThreePointArc((-0.223750509, 5.986515514), (-0.131569604, 6.087578078), (0, 6.125))
            ThreePointArc((0, 6.125), (0.131569604, 6.087578078), (0.223750509, 5.986515514))
        make_face(mode=Mode.SUBTRACT)
    extrude(amount=CUT_EXTRUDE1_DEPTH, mode=Mode.SUBTRACT)

    # Sketch3 → Cut-Extrude2 (cut, through all)
    with BuildSketch(Plane(origin=(0, 16, 0), x_dir=(1, 0, 0), z_dir=(0, 1, 0))):
        with Locations(Location((0, 0, 0), (0, 0, 270))):
            Circle(SKETCH3_R)
    extrude(amount=-CUT_EXTRUDE2_DEPTH, mode=Mode.SUBTRACT)

    # M3x0.5 Tapped Hole1 outline → M3x0.5 Tapped Hole1 (revolve, cut)
    with BuildSketch(Plane.XZ.offset(-3.725)):
        Polygon((2.000000319, 8.025000319), (0, 8.025000319), (0, 3.799586083), (1.25, 3.799586083), (1.25, 7.275), align=None)
    m3x0_5_tapped_hole1 = revolve(axis=Axis((0, 3.725, 0), (0, 0, 1)), mode=Mode.SUBTRACT)

    # CirPattern1: M3x0.5 Tapped Hole1 ×2 about axis
    cirpattern1_axis = Axis((0, 16, 0), (0, 1, 0))
    for i in range(1, CIRPATTERN1_COUNT):
        add(m3x0_5_tapped_hole1.rotate(cirpattern1_axis, i * CIRPATTERN1_ANGLE / (CIRPATTERN1_COUNT - 1)), mode=Mode.SUBTRACT)


solid = part.part
